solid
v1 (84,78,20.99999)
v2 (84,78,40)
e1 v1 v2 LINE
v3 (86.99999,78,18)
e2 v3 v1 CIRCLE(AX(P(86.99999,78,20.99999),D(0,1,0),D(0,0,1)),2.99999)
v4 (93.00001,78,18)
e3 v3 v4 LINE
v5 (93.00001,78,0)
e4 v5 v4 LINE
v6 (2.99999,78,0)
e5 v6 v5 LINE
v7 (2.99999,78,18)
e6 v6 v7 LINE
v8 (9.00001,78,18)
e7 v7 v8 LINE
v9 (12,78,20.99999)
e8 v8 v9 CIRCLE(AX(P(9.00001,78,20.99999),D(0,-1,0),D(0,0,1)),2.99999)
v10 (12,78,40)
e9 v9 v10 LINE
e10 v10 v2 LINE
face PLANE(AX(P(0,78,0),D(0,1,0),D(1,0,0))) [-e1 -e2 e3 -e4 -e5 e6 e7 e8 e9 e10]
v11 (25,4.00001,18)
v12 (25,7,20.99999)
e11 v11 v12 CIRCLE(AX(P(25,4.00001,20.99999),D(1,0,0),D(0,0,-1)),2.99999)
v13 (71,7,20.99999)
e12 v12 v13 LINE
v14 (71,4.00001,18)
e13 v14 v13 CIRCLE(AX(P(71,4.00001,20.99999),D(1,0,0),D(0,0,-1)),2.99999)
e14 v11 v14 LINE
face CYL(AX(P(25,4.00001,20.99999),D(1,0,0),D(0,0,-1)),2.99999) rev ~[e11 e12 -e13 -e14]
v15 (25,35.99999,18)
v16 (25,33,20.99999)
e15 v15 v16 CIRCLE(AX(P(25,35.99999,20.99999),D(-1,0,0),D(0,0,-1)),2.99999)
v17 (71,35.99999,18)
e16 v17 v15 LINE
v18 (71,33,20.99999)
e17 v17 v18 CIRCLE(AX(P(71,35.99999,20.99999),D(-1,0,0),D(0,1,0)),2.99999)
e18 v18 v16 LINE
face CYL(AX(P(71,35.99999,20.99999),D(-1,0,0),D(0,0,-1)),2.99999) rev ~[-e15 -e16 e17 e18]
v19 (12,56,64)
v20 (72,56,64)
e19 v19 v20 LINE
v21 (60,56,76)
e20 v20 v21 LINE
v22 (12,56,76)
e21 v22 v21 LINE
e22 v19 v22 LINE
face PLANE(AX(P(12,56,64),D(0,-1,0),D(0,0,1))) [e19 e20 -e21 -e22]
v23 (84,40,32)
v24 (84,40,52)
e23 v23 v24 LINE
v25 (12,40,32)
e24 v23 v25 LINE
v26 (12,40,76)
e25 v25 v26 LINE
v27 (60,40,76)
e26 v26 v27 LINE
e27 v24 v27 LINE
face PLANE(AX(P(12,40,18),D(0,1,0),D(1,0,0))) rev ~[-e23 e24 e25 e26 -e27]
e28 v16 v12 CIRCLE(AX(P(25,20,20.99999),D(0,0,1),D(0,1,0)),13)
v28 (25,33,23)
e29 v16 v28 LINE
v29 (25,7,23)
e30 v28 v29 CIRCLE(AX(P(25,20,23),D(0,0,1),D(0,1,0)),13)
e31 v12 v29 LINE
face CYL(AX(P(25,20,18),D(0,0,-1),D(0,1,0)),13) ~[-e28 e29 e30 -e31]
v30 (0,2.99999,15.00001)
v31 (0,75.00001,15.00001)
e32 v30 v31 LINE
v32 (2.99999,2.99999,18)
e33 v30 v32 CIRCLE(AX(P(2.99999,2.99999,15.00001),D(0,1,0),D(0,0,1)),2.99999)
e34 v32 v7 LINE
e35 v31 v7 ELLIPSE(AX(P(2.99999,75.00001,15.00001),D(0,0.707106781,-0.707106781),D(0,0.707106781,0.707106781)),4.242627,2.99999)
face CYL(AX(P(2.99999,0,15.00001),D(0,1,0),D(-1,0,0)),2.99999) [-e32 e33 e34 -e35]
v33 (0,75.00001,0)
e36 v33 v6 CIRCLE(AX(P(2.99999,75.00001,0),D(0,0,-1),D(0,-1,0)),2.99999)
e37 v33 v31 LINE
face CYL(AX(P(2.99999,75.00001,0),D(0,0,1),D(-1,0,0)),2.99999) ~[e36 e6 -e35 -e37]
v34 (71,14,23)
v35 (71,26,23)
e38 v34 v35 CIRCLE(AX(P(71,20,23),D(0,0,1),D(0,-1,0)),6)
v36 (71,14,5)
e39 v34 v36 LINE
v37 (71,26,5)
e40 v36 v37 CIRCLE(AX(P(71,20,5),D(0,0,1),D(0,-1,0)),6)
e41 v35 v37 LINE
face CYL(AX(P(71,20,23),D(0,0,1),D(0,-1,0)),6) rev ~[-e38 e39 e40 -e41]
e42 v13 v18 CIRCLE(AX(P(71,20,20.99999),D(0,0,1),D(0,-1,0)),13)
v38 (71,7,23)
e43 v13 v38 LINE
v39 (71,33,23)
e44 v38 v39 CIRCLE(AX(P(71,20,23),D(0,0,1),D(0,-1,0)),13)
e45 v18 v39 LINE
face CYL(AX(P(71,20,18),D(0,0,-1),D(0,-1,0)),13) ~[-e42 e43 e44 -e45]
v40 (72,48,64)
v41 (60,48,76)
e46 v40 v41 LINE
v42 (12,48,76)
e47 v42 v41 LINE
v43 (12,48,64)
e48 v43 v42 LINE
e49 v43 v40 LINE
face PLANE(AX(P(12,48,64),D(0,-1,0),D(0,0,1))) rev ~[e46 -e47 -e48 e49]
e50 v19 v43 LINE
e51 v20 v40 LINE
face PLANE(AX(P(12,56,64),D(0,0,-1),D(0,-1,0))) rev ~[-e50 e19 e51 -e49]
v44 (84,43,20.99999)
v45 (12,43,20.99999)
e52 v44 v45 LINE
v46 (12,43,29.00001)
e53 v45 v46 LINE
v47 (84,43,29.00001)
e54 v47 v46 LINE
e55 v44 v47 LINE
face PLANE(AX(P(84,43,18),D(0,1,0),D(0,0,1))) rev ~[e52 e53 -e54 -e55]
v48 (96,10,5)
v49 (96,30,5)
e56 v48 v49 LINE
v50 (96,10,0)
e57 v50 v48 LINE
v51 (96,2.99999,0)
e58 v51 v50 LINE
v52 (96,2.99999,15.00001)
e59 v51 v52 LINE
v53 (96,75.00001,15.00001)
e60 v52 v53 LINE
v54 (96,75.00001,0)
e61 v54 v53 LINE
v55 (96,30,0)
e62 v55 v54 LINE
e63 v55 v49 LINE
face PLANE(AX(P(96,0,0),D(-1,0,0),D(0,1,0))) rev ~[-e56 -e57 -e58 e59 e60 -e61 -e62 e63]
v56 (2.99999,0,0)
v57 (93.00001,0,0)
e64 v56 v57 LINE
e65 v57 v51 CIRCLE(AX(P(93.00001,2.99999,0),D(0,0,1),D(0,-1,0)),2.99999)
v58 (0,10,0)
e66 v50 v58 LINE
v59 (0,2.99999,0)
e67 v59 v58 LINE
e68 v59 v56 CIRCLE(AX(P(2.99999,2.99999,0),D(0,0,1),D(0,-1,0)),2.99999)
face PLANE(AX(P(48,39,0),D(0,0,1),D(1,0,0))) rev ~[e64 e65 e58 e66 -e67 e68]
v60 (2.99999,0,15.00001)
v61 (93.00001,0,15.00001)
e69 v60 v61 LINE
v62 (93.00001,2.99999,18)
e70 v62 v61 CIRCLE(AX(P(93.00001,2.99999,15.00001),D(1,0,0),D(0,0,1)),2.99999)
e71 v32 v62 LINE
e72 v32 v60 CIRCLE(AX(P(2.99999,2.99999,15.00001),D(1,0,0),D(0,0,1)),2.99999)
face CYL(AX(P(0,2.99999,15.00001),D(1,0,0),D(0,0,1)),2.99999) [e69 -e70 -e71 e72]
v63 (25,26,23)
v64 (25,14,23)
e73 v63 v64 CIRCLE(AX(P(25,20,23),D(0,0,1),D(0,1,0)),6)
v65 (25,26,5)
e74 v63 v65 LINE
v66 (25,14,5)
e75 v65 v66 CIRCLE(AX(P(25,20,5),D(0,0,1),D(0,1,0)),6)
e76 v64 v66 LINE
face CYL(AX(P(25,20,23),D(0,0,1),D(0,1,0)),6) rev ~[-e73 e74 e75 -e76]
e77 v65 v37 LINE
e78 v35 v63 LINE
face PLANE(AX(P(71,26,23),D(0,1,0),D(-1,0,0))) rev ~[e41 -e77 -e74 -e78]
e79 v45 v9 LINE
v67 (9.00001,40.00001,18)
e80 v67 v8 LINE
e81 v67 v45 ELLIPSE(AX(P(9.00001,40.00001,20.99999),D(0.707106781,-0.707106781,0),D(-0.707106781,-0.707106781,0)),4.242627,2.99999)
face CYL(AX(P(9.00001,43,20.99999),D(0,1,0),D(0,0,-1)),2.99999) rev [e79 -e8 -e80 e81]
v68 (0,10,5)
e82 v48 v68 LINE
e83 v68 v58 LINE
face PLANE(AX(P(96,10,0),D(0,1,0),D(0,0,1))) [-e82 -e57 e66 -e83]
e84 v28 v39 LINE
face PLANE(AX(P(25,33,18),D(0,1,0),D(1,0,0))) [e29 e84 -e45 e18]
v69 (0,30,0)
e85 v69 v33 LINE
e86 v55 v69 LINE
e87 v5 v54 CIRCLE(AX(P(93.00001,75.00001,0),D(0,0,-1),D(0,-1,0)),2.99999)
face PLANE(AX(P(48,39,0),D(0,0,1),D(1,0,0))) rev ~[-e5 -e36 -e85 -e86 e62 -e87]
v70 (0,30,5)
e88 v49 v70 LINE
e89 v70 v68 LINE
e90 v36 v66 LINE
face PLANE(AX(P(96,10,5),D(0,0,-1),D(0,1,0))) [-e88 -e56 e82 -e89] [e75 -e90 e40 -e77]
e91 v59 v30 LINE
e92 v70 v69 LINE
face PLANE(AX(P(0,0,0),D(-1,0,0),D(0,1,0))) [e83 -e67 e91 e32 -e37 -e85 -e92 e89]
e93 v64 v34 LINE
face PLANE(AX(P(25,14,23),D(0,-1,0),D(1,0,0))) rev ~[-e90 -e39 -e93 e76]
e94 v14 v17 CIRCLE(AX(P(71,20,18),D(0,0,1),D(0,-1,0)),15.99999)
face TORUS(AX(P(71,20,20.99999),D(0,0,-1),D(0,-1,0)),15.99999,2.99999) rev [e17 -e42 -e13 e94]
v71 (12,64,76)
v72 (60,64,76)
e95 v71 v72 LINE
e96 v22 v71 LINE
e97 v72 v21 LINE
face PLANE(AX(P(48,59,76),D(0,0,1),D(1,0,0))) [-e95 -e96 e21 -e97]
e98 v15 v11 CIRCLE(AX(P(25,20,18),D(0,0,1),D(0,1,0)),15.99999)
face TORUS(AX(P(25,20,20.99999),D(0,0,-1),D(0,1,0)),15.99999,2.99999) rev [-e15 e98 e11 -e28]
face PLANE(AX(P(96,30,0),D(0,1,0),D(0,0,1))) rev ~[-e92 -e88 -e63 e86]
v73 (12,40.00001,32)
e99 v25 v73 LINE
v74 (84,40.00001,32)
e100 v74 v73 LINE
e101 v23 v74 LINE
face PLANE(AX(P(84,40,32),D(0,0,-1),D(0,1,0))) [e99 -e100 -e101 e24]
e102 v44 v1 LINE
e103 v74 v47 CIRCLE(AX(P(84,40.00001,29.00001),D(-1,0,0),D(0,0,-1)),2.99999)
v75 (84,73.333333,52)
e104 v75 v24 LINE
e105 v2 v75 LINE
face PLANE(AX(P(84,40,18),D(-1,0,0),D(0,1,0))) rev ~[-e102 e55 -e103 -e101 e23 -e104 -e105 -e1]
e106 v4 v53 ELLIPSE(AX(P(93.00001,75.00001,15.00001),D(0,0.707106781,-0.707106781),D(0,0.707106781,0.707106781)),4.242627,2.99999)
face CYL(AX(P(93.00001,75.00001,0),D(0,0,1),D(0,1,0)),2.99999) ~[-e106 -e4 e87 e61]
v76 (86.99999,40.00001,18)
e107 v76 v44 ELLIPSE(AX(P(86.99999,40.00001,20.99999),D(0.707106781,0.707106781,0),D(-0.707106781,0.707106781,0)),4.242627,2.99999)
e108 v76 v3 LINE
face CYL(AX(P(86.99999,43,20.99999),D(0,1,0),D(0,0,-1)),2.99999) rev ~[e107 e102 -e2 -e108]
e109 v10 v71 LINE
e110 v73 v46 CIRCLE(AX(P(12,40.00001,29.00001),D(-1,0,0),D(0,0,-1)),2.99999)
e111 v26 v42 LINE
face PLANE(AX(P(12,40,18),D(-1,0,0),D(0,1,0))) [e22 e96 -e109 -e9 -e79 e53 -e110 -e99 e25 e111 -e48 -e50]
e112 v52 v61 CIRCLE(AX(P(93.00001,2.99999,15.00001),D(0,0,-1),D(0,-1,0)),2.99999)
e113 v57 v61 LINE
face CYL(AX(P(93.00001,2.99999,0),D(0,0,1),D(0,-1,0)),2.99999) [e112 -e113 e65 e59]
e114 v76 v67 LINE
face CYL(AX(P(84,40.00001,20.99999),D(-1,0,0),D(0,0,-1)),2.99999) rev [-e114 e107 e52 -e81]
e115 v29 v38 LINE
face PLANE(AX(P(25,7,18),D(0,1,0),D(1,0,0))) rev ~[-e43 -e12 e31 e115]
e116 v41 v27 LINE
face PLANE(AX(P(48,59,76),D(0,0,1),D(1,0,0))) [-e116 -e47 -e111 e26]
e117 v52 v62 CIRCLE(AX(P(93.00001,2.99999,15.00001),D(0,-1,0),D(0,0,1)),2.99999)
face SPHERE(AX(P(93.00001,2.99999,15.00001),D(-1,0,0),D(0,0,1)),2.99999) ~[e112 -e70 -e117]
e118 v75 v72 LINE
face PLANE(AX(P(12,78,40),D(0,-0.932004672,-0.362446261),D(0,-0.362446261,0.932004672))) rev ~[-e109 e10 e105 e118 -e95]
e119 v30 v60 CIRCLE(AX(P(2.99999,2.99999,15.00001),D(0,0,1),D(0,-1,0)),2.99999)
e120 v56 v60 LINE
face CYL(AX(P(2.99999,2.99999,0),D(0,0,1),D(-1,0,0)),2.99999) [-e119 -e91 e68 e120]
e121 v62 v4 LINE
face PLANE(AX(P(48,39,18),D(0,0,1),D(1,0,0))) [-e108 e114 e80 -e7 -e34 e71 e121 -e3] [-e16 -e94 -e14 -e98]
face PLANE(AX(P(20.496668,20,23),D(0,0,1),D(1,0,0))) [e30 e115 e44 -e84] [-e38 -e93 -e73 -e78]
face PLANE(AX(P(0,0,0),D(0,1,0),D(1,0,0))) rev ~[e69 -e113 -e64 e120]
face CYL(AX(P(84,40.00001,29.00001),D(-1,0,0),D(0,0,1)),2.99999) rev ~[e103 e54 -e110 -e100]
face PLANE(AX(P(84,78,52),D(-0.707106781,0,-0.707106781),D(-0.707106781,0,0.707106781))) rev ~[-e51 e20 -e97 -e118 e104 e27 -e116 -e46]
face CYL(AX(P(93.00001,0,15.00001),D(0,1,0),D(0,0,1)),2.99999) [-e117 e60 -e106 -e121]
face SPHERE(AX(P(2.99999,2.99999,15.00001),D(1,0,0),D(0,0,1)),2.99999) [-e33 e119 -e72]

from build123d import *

# Parameters (mm, degrees)
F0_W      = 96
F0_H      = 78
F1_DEPTH  = 18
F2_W      = 72
F2_H      = 38
F4_DEPTH  = 58
F6_DEPTH  = 38
F7_W      = 8
F7_H      = 12
F8_DEPTH  = 60.001
F10_DEPTH = 72.001
F11_W     = 20
F11_H     = 5
F12_DEPTH = 96.001
F13_W     = 46
F13_H     = 26
F14_DEPTH = 5
F17_DEPTH = 23.001
F18_W     = 3
F18_H     = 14
F19_DEPTH = 72
F20_R     = 2.99999


# Not quite as in the source:
# - a fillet or chamfer is up to 0.001 mm smaller than in the source, because OpenCascade refuses the exact size


with BuildPart() as f1:
    # F0 (on Top) → F1 (new body)
    with BuildSketch(Plane.XY):
        with Locations((48, 39)):
            Rectangle(F0_W, F0_H)
    extrude(amount=F1_DEPTH)

    # F2 (on face) → F4 (join, through all)
    with BuildSketch(Plane.XY.offset(18)):
        with Locations((48, 59)):
            Rectangle(F2_W, F2_H)
    extrude(amount=F4_DEPTH)

    # F5 (on face) → F6 (cut, through all)
    with BuildSketch(Plane(origin=(0, 78, 0), x_dir=(-1, 0, 0), z_dir=(0, 1, 0))):
        Polygon((-60, 76), (-84, 76), (-84, 52), align=None)
    extrude(amount=-F6_DEPTH, mode=Mode.SUBTRACT)

    # F7 (on face) → F8 (cut, through all)
    with BuildSketch(Plane(origin=(12, 0, 0), x_dir=(0, -1, 0), z_dir=(-1, 0, 0))):
        with Locations((-52, 70)):
            Rectangle(F7_W, F7_H)
    extrude(amount=-F8_DEPTH, mode=Mode.SUBTRACT)

    # F9 (on face) → F10 (cut, through all)
    with BuildSketch(Plane(origin=(12, 0, 0), x_dir=(0, -1, 0), z_dir=(-1, 0, 0))):
        Polygon((-78, 40), (-64, 76), (-78, 76), align=None)
    extrude(amount=-F10_DEPTH, mode=Mode.SUBTRACT)

    # F11 (on face) → F12 (cut, through all)
    with BuildSketch(Plane.YZ.offset(96)):
        with Locations((20, 2.5)):
            Rectangle(F11_W, F11_H)
    extrude(amount=-F12_DEPTH, mode=Mode.SUBTRACT)

    # F13 (on face) → F14 (join)
    with BuildSketch(Plane.XY.offset(18)):
        with BuildLine():
            Line((25, 7), (25, 33))
            ThreePointArc((25, 33), (12, 20), (25, 7))
        make_face()
        with BuildLine():
            ThreePointArc((71, 7), (84, 20), (71, 33))
            Line((71, 33), (71, 7))
        make_face()
        with Locations((48, 20)):
            Rectangle(F13_W, F13_H)
    extrude(amount=F14_DEPTH)

    # F15 (on face) → F17 (cut, through all)
    with BuildSketch(Plane.XY.offset(23)):
        with BuildLine():
            ThreePointArc((25, 26), (19, 20), (25, 14))
            Line((25, 14), (71, 14))
            ThreePointArc((71, 14), (77, 20), (71, 26))
            Line((71, 26), (25, 26))
        make_face()
    extrude(amount=-F17_DEPTH, mode=Mode.SUBTRACT)

    # F18 (on face) → F19 (cut, through all)
    with BuildSketch(Plane.YZ.offset(84)):
        with Locations((41.5, 25)):
            Rectangle(F18_W, F18_H)
    extrude(amount=-F19_DEPTH, mode=Mode.SUBTRACT)

    # F20 (radius 3 in the source; OpenCascade refuses exactly that, so slightly less here)
    f20_edges = [f1.edges().sort_by_distance(p)[0] for p in [
        (48, 7, 18),
        (48, 43, 18),
        (48, 43, 32),
        (48, 0, 18),
        (0, 39, 18),
        (84, 60.5, 18),
        (12, 60.5, 18),
        (96, 39, 18),
        (96, 0, 9),
        (0, 0, 9),
        (96, 78, 9),
        (0, 78, 9),
    ]]
    fillet(f20_edges, radius=F20_R)


solid = f1.part
